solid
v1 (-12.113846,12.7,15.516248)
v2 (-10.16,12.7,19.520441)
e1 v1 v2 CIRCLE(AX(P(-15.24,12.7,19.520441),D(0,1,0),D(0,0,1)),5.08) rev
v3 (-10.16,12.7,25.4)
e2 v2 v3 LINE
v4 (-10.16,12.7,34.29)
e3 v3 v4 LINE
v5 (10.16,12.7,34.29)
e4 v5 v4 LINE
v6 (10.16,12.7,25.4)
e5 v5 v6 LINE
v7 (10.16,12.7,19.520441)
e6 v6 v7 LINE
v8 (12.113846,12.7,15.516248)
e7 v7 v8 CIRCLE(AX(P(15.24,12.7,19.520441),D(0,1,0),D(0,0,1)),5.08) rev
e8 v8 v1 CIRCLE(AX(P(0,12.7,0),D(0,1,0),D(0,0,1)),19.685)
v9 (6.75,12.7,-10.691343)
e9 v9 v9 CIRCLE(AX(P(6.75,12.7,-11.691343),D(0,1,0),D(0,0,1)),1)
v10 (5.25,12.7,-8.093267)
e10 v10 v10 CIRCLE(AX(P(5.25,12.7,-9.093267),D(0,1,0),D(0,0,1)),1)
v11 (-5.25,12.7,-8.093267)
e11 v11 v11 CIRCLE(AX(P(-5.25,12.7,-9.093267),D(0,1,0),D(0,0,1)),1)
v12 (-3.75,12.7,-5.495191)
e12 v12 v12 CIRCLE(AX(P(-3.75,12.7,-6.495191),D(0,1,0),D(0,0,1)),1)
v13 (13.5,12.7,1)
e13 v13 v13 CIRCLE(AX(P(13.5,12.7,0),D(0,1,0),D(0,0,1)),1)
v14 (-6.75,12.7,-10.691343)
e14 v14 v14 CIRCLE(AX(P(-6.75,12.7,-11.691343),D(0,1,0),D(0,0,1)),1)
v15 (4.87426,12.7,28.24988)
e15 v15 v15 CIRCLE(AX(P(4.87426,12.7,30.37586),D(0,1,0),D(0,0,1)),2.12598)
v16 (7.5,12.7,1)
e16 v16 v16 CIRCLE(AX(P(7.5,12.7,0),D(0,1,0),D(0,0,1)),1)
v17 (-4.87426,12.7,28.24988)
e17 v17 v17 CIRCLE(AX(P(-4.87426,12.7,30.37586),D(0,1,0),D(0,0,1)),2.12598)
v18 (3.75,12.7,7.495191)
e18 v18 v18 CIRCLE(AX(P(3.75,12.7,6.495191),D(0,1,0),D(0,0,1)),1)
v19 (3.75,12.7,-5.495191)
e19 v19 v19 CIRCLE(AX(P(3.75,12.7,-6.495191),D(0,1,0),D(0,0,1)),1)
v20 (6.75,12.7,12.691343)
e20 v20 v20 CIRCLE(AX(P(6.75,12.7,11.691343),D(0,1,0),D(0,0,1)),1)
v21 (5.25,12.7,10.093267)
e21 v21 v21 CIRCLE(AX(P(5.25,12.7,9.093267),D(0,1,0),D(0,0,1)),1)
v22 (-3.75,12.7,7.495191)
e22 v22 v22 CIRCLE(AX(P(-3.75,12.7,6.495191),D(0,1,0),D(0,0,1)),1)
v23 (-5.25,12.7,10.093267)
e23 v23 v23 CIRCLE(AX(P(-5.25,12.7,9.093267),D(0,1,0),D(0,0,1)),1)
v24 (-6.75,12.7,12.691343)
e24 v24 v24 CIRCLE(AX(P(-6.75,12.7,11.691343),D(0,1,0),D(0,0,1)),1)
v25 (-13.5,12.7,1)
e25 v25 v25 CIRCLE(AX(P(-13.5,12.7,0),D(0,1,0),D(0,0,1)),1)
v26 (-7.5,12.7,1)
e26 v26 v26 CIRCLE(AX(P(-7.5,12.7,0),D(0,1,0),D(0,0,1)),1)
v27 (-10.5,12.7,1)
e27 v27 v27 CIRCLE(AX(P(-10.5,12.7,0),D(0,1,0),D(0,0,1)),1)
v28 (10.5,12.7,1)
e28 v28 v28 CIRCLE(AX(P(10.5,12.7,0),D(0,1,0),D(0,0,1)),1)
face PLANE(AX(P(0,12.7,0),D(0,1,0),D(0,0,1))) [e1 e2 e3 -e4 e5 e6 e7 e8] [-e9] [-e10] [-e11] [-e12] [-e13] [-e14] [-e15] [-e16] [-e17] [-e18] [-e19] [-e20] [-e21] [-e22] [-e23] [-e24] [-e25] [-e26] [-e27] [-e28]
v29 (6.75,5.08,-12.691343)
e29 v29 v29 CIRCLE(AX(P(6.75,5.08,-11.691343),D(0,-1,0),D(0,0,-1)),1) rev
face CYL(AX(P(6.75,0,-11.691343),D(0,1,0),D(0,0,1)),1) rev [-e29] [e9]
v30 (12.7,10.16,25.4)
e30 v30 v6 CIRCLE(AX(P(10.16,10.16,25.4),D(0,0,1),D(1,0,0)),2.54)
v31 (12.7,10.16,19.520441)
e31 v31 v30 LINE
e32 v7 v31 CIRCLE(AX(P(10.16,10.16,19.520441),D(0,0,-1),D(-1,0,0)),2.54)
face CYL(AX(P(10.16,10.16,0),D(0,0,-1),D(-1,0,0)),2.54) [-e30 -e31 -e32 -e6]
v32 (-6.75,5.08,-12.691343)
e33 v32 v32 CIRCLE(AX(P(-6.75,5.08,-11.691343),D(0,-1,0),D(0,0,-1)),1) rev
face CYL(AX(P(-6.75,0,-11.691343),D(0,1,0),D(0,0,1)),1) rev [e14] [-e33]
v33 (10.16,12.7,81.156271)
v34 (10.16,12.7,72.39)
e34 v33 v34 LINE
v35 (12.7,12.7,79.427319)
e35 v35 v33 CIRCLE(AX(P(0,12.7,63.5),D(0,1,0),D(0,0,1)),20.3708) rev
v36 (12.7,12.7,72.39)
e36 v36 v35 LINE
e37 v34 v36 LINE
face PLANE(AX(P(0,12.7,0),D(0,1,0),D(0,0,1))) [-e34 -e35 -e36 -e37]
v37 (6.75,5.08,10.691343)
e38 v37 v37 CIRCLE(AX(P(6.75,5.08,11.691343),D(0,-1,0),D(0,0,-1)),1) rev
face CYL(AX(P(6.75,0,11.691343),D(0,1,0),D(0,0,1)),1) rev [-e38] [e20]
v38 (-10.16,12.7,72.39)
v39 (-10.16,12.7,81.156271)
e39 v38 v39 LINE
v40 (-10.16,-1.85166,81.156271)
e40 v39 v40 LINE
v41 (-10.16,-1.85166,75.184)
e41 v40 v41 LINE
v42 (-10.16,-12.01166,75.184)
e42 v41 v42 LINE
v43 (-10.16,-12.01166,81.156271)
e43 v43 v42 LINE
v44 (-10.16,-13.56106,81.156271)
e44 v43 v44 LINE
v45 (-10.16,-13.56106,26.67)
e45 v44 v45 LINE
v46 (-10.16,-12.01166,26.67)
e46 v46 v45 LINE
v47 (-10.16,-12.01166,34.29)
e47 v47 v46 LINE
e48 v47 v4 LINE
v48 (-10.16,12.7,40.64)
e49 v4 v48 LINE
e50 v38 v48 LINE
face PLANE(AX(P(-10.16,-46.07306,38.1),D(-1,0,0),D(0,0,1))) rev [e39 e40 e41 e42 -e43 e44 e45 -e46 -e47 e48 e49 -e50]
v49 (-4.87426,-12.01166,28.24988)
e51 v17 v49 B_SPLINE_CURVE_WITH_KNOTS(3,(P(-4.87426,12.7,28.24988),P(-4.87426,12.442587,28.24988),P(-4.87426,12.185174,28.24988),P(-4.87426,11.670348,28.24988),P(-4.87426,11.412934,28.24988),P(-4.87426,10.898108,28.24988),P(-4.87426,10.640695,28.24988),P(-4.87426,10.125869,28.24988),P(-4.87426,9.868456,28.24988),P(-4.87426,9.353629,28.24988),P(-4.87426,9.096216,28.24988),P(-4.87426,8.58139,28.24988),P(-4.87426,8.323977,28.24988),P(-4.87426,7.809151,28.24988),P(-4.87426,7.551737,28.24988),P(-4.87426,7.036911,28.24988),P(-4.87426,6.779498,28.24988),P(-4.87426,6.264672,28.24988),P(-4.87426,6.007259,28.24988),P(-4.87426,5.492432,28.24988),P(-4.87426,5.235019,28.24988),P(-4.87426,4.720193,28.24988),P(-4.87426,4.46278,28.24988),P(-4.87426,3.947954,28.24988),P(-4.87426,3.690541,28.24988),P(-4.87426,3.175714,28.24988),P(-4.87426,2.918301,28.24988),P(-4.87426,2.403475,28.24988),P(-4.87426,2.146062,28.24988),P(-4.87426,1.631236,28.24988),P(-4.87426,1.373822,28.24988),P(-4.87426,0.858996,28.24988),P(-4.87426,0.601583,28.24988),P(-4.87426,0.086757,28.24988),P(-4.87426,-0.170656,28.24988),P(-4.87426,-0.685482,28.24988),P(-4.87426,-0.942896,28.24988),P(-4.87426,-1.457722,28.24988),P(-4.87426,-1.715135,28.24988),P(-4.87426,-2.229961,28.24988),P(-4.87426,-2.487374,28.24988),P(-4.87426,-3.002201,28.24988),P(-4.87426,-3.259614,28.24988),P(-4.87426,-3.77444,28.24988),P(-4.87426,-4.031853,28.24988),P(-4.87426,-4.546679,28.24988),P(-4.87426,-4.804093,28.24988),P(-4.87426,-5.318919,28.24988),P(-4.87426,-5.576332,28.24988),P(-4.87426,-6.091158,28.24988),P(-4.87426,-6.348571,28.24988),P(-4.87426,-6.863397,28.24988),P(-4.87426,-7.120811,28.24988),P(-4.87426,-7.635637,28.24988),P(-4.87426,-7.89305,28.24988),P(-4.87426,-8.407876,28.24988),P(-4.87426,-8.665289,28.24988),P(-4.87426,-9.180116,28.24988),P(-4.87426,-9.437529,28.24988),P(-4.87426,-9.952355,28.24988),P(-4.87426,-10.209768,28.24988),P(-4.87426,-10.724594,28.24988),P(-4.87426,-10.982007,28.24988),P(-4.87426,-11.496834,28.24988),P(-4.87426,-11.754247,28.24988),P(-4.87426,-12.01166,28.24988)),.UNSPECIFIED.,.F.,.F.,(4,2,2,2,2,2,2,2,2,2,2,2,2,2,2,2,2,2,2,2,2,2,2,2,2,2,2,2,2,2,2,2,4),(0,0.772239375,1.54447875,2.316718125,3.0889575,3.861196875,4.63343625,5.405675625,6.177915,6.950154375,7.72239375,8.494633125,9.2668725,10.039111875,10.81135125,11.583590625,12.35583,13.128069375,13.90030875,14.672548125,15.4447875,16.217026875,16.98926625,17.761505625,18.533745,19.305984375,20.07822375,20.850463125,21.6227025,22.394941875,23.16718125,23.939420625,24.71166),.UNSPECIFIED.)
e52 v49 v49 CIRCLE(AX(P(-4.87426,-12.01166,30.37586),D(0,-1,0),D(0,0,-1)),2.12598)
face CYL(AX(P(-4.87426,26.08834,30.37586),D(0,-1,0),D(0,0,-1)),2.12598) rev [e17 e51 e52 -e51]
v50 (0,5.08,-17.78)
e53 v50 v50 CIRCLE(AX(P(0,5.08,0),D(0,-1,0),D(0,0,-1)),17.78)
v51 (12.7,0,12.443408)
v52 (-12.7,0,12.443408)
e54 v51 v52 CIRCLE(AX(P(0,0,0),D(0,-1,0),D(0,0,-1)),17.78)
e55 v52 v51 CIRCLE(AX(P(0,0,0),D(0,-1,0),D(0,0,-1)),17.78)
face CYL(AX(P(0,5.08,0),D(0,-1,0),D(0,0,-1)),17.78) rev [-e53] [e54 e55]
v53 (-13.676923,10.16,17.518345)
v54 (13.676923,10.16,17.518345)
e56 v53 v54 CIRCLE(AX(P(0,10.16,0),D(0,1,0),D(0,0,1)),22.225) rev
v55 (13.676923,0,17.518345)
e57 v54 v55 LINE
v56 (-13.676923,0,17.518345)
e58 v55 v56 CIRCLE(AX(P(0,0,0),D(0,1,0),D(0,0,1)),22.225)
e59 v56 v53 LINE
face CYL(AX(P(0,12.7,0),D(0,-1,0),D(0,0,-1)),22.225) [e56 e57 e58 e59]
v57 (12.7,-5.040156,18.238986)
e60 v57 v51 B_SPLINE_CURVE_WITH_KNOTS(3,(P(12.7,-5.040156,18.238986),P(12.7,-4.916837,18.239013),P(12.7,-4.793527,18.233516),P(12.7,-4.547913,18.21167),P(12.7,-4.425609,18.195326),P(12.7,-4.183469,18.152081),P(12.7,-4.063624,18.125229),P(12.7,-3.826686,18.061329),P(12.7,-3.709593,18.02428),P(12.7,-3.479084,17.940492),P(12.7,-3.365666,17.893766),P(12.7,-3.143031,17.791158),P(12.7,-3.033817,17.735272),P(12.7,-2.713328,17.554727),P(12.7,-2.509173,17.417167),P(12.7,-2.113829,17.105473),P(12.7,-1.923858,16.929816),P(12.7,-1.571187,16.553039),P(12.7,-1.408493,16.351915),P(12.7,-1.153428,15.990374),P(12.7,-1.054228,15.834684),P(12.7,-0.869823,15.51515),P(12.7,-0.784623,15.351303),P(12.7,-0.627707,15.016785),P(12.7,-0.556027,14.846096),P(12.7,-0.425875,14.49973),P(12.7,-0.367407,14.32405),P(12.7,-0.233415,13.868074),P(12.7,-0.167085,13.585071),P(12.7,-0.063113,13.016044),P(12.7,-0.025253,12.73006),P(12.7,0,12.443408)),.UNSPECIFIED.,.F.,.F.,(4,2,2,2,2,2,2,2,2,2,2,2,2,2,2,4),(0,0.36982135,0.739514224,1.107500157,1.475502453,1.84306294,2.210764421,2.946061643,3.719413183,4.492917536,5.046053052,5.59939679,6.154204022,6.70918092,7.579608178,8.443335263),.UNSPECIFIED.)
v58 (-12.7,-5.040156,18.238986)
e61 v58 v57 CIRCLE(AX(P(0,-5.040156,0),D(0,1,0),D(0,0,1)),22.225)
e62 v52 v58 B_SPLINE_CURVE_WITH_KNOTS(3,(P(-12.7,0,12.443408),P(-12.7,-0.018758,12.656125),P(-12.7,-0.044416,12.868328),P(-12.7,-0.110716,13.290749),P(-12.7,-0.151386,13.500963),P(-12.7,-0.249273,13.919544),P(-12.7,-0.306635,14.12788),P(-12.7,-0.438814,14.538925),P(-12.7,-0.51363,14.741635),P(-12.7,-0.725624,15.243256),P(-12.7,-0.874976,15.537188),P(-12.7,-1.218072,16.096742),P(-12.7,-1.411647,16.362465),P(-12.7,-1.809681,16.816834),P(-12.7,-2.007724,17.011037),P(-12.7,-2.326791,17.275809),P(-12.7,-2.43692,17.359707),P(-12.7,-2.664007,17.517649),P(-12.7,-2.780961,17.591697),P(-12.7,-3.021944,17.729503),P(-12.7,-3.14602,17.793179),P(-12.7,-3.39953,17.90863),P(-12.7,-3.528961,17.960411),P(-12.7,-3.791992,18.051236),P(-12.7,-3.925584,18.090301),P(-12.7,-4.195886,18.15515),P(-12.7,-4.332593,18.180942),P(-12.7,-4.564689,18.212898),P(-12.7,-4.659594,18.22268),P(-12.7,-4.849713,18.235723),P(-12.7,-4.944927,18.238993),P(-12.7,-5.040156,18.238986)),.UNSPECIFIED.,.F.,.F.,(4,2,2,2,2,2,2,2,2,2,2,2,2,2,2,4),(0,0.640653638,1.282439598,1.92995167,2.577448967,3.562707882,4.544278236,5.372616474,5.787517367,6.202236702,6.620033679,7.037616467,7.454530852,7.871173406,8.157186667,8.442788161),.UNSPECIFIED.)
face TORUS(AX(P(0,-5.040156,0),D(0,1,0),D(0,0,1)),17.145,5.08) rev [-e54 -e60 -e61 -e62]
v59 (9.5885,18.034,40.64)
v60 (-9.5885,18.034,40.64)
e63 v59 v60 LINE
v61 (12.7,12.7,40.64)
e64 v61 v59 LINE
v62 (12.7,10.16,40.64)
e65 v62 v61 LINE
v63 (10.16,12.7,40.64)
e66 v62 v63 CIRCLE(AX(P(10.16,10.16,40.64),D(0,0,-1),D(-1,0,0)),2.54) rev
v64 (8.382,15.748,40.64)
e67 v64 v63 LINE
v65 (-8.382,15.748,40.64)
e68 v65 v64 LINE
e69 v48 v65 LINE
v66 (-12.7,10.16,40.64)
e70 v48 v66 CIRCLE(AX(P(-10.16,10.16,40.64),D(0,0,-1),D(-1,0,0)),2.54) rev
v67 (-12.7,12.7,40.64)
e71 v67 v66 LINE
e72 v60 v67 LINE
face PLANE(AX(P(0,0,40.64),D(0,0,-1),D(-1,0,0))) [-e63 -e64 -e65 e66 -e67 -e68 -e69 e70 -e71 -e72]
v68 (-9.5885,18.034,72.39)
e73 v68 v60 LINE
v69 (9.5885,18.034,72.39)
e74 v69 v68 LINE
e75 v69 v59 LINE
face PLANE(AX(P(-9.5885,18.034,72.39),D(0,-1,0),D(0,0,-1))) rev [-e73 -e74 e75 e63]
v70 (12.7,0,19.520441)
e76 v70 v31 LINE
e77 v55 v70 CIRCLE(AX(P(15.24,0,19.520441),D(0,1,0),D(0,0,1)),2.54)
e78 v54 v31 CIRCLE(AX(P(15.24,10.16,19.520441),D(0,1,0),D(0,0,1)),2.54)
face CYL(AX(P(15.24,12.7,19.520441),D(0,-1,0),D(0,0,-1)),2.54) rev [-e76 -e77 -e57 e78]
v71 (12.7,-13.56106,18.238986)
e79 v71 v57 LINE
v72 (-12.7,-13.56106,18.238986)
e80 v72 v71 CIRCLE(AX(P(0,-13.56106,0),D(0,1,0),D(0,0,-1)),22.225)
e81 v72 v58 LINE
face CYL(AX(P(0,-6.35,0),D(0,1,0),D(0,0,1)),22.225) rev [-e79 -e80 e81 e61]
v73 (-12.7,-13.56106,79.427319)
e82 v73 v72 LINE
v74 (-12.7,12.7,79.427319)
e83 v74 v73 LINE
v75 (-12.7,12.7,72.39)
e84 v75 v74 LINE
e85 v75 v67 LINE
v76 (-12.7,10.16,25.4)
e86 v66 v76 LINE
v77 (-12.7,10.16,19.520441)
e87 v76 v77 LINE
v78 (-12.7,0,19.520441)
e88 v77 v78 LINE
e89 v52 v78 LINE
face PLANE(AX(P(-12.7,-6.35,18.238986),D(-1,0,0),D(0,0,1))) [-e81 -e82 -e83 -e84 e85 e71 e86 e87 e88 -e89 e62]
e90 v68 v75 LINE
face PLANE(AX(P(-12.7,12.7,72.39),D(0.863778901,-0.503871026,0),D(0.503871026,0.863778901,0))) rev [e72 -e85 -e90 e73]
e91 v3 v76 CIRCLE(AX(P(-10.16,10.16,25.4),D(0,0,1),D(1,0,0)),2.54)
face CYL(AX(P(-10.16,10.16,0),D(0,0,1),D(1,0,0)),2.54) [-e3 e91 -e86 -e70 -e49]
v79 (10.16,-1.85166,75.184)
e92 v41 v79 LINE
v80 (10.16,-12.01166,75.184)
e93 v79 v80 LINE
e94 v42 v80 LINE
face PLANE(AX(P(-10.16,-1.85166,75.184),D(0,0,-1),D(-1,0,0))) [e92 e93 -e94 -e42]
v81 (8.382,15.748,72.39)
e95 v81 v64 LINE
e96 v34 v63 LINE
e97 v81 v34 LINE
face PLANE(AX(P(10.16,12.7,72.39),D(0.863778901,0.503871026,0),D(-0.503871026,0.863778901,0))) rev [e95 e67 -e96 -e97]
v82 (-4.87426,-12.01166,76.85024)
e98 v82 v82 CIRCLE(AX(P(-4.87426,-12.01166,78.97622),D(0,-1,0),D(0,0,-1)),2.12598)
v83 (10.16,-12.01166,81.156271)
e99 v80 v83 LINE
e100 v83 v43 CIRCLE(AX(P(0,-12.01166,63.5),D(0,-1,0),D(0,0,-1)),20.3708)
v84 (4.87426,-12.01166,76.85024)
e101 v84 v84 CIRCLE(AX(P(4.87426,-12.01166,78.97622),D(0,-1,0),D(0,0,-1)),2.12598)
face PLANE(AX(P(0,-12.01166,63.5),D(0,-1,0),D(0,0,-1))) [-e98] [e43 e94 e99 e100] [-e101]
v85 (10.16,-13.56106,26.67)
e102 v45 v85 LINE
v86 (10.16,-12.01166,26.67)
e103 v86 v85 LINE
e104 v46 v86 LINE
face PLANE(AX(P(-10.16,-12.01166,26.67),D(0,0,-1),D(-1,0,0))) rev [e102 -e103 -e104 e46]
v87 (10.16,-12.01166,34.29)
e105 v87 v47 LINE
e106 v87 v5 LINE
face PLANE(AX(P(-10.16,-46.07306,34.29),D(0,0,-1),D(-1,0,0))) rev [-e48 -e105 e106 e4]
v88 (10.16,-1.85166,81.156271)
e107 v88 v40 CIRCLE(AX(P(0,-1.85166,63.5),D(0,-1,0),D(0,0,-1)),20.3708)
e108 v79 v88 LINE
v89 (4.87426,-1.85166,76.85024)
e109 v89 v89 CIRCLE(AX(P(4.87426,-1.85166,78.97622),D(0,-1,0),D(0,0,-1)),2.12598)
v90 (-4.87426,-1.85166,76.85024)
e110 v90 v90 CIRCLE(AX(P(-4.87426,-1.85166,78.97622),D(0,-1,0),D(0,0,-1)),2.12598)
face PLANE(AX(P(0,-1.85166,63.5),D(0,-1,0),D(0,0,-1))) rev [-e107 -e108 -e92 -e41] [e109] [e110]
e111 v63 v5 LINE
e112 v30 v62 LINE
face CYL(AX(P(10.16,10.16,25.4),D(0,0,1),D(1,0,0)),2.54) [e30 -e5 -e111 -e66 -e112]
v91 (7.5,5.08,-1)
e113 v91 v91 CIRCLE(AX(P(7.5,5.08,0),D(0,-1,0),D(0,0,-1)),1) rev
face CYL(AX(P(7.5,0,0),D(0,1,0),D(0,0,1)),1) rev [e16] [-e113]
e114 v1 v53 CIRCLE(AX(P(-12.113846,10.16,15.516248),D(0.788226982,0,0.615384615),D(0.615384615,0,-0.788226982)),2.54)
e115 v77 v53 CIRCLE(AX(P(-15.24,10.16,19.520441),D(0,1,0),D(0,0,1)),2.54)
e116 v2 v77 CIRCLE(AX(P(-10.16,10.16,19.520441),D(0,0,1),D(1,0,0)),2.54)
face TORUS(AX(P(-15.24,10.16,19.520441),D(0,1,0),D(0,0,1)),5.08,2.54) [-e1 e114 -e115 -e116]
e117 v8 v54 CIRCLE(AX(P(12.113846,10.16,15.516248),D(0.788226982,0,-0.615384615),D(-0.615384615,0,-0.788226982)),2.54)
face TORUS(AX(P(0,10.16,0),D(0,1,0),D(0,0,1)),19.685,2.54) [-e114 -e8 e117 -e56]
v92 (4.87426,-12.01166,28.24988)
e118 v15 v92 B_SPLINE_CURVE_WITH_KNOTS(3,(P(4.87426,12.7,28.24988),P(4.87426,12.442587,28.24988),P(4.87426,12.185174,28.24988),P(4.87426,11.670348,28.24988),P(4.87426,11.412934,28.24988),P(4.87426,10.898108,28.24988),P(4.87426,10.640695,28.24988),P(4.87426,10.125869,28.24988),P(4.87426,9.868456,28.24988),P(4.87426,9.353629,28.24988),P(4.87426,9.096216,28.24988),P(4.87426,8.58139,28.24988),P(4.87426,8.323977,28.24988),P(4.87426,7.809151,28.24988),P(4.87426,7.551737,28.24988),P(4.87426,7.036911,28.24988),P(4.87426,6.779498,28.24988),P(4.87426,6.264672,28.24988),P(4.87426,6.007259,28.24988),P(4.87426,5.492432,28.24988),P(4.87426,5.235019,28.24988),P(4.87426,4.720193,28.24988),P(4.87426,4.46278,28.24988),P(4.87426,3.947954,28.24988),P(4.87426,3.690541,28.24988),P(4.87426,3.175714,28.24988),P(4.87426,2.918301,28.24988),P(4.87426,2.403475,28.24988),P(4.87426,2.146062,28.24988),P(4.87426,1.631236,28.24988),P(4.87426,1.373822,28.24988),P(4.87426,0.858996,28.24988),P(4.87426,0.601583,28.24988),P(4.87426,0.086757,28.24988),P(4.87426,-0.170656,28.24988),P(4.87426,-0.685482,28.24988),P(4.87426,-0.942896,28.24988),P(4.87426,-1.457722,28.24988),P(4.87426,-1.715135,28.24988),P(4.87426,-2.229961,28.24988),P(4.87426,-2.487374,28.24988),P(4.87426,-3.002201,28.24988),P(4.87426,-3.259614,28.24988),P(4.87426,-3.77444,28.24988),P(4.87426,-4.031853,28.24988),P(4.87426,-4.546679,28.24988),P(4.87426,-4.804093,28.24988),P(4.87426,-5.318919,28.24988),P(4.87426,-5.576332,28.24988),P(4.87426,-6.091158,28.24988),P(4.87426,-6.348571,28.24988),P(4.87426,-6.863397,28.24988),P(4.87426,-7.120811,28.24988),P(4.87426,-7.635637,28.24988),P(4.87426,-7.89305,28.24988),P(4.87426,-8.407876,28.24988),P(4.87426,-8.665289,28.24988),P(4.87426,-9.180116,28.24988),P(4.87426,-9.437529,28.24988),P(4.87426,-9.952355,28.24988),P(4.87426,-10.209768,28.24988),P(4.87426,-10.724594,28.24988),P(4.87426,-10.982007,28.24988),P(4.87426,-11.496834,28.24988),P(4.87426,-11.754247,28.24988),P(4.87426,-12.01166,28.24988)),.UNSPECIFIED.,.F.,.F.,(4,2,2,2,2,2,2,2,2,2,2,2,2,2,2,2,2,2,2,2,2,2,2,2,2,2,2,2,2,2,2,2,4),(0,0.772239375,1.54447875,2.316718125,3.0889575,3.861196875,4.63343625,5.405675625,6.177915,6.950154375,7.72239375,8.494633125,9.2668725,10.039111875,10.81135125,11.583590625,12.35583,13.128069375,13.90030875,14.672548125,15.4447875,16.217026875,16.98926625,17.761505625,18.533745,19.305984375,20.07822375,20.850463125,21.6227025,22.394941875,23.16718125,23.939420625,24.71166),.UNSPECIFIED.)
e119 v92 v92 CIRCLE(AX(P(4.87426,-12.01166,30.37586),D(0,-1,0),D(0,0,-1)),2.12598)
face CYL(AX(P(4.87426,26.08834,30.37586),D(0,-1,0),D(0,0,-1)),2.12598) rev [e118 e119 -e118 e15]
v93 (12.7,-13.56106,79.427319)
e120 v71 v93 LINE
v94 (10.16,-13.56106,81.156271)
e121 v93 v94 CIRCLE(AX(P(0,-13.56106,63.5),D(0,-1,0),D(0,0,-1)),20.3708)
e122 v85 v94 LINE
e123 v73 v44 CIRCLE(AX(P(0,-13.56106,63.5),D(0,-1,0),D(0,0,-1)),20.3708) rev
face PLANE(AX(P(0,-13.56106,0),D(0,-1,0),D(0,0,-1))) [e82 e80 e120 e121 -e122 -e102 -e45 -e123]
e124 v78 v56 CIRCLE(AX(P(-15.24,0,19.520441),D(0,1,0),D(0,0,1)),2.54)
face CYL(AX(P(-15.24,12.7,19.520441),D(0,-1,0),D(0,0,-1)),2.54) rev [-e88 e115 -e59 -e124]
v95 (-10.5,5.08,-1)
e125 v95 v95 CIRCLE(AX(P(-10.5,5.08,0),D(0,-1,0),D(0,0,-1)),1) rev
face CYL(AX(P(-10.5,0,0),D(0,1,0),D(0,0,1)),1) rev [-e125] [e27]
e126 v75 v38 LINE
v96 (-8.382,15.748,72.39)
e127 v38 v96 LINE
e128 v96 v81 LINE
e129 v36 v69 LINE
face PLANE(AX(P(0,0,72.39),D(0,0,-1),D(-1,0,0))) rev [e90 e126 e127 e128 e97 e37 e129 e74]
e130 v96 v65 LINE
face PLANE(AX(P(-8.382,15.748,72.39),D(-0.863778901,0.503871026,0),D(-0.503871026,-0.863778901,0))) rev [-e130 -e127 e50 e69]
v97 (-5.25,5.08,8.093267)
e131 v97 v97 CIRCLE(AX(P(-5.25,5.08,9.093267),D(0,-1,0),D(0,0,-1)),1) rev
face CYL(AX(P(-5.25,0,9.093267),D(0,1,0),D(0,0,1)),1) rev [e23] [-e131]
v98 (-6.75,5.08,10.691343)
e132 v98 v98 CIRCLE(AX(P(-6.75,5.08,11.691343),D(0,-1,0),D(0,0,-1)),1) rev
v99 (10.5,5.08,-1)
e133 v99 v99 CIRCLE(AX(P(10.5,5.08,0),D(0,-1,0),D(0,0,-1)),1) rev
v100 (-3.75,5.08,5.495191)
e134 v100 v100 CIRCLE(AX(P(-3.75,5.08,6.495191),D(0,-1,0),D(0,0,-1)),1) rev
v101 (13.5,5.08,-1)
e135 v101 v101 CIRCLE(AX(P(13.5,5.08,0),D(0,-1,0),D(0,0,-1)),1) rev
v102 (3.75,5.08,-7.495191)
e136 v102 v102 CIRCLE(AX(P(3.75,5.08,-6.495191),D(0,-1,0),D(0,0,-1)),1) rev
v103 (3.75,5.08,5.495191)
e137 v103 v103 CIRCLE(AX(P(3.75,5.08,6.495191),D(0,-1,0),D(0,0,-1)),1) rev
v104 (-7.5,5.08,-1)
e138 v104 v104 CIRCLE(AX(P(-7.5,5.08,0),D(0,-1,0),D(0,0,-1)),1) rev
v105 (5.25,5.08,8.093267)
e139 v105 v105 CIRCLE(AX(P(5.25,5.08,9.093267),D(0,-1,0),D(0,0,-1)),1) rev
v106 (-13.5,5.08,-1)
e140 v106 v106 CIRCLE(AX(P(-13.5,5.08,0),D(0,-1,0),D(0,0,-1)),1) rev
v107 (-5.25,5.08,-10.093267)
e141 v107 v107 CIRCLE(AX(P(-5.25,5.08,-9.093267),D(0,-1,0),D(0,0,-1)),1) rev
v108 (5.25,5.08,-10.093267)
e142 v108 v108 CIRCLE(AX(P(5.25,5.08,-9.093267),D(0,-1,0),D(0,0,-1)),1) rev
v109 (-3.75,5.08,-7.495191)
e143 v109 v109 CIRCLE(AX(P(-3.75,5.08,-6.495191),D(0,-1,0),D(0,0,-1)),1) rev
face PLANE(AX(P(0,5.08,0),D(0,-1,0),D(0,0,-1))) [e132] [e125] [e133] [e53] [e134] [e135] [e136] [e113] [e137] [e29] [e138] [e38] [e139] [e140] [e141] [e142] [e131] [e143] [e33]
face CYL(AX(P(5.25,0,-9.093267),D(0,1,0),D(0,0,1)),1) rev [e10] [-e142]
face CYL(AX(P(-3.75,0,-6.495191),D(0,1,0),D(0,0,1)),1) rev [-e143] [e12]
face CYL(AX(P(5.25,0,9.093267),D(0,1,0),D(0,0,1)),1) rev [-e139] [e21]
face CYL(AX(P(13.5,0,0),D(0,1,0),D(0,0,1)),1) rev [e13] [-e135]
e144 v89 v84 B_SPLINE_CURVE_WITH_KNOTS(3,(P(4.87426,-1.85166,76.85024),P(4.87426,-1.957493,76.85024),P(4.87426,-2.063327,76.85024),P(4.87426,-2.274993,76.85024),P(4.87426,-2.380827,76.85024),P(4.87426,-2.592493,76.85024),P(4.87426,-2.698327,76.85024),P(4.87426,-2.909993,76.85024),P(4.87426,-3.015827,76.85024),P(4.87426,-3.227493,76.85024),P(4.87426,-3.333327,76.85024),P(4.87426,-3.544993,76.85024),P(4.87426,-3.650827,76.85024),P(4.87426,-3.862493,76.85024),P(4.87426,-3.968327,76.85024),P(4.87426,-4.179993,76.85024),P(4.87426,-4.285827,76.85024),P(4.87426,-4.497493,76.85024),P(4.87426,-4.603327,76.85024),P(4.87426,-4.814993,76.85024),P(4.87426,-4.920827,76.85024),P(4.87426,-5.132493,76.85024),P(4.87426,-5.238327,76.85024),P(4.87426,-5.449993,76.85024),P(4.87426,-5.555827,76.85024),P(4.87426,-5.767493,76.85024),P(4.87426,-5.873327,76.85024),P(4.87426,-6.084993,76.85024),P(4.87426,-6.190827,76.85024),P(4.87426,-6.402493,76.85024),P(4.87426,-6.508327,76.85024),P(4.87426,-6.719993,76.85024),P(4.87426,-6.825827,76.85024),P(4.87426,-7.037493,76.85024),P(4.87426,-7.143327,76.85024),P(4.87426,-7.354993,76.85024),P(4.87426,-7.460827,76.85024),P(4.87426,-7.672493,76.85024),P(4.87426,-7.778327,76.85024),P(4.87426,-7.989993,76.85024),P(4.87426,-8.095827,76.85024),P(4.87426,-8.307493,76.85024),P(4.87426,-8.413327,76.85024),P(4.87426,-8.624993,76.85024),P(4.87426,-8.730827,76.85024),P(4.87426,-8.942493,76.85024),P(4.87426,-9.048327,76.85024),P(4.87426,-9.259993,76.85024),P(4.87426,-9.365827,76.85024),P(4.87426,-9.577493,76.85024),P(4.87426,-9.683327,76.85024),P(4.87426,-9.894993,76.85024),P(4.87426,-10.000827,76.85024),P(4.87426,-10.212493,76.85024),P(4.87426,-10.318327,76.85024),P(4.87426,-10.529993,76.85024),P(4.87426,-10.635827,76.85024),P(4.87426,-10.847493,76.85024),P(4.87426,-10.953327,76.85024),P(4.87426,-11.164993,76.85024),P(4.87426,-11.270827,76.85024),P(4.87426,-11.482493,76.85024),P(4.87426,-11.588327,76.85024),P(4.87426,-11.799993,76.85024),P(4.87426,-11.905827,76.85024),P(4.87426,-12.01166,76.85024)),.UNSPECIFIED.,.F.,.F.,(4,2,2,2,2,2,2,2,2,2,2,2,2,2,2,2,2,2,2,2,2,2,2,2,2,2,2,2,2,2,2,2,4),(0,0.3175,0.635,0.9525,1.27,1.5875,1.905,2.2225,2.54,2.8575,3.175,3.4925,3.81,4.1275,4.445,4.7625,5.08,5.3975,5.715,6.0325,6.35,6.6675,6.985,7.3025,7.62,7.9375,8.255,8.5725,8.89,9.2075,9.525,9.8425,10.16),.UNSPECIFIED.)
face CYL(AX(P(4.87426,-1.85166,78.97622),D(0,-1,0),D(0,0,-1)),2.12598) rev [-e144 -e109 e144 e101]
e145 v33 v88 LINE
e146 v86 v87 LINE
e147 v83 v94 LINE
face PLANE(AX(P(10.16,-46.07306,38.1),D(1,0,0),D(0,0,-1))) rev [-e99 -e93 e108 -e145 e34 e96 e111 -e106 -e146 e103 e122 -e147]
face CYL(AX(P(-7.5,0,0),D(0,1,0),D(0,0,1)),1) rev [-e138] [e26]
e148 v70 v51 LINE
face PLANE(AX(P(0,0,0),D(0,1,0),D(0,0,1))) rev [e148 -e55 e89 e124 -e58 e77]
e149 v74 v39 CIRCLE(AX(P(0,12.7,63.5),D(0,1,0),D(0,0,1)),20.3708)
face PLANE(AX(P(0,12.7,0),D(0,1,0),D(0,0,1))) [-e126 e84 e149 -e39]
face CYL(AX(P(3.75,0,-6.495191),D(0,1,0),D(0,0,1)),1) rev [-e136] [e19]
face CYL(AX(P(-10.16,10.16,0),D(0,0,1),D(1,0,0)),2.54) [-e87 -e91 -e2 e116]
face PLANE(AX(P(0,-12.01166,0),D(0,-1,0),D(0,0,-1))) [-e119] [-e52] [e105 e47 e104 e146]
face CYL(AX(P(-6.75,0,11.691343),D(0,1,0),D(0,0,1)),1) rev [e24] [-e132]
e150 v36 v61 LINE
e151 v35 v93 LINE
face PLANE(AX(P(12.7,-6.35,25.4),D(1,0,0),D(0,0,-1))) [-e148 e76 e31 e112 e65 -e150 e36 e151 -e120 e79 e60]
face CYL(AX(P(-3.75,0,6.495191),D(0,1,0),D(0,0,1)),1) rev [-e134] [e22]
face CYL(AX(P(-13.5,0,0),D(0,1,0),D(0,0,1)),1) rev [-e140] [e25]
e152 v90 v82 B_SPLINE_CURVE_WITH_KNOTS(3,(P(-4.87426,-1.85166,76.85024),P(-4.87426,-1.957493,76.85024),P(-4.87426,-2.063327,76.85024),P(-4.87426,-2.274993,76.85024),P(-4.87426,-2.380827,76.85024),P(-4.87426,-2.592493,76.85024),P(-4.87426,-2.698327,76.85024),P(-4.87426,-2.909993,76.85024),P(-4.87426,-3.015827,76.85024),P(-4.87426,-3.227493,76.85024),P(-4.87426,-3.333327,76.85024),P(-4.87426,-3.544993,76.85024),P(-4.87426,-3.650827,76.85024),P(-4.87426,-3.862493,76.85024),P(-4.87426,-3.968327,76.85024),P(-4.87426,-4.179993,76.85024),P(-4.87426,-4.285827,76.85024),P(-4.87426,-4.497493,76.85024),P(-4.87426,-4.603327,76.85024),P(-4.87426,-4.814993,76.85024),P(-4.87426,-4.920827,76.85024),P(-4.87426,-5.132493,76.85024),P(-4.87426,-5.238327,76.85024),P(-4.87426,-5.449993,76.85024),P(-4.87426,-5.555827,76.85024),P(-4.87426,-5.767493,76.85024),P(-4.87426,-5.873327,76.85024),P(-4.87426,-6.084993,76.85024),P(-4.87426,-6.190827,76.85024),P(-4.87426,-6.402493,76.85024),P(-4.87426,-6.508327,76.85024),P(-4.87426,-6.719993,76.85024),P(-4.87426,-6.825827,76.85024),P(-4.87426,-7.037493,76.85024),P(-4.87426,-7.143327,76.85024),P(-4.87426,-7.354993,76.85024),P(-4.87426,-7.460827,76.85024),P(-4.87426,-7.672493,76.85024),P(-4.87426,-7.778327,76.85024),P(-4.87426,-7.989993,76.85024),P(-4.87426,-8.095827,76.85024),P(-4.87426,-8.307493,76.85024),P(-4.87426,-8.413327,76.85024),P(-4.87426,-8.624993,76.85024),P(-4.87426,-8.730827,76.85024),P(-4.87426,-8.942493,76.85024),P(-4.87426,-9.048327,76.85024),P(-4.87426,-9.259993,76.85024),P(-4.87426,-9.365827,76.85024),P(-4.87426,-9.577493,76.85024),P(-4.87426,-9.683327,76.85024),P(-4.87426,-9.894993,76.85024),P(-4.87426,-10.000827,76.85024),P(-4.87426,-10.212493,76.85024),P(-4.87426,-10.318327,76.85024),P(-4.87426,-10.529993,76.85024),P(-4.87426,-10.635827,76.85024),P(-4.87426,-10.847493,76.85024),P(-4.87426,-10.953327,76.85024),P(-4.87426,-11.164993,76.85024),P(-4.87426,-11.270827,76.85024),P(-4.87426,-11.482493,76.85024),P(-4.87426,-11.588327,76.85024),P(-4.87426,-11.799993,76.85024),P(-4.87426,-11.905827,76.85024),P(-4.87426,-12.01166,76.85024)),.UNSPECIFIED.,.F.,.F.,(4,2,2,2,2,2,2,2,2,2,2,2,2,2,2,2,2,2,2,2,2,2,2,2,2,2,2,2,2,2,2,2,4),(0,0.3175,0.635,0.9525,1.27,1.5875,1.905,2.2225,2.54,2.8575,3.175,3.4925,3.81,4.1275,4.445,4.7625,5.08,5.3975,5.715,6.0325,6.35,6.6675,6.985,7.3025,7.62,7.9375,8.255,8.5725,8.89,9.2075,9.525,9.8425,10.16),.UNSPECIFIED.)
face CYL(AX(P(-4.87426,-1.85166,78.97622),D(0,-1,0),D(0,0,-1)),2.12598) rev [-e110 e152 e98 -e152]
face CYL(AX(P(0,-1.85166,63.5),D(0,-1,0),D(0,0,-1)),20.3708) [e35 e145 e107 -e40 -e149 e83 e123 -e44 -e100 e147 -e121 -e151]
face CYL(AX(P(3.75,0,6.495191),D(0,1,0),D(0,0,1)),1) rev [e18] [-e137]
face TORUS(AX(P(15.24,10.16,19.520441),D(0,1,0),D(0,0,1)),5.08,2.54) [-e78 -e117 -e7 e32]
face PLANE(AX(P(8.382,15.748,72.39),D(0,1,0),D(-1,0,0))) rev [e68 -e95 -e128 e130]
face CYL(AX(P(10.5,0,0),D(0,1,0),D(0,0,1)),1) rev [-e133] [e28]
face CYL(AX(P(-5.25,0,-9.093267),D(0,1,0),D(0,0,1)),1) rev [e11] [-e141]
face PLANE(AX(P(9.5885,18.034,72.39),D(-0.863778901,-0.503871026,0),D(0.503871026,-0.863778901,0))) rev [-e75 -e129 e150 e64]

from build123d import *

# Parameters (mm, degrees)
SKETCH2_R           = 22.224999999999998
BOSS_EXTRUDE1_DEPTH = 12.7
SKETCH3_R           = 1.0000000000000009
SKETCH3_R_2         = 1.0000000000000002
SKETCH3_R_3         = 0.9999999999999998
CUT_EXTRUDE1_DEPTH  = 34.89972345019941
BOSS_EXTRUDE2_START = -19.05
BOSS_EXTRUDE2_DEPTH = 19.05
SKETCH8_R           = 17.779999999999998
CUT_EXTRUDE2_DEPTH  = 5.08
FILLET5_R           = 5.08
FILLET6_R           = 2.5399999999999996
FILLET7_R           = 2.5399999999999996
BOSS_EXTRUDE3_START = 7.211059999999999
BOSS_EXTRUDE3_DEPTH = 7.211059999999999
BOSS_EXTRUDE4_DEPTH = 25.4
SKETCH13_W          = 25.399999999999995
SKETCH13_H          = 26.261059999999993
BOSS_EXTRUDE5_DEPTH = 12.7
SKETCH15_W          = 20.32
SKETCH15_H          = 3.8100000000000023
CUT_EXTRUDE3_DEPTH  = 58.77305999999999
SKETCH16_W          = 20.32
SKETCH16_H          = 7.619999999999997
CUT_EXTRUDE4_DEPTH  = 1.5493999999999999
SKETCH18_R          = 2.1259799999999998
SKETCH18_R_2        = 2.12598
CUT_EXTRUDE5_DEPTH  = 38.09999999999998
SKETCH19_W          = 2.5399999999999974
SKETCH19_H          = 26.261059999999993
BOSS_EXTRUDE6_DEPTH = 39.370000000000005
BOSS_EXTRUDE7_DEPTH = 31.75
FILLET12_R          = 2.54
FILLET13_R          = 2.54
BOSS_EXTRUDE8_DEPTH = 10.15999999999999
SKETCH25_R          = 2.1259800000000015
SKETCH25_R_2        = 2.125980000000002
CUT_EXTRUDE6_DEPTH  = 10.15999999999999
BOSS_EXTRUDE9_DEPTH = 26.26106


# Some blends are built 0.0001 mm under size
with BuildPart() as part:
    # Sketch2 → Boss-Extrude1 (new body)
    with BuildSketch(Plane(origin=(0, 0, 0), x_dir=(1, 0, 0), z_dir=(0, 1, 0))):
        with Locations(Location((0, 0, 0), (0, 0, 270))):
            Circle(SKETCH2_R)
    extrude(amount=BOSS_EXTRUDE1_DEPTH)

    # Sketch3 → Cut-Extrude1 (cut, through all)
    with BuildSketch(Plane(origin=(0, 12.7, 0), x_dir=(1, 0, 0), z_dir=(0, 1, 0))):
        with Locations(Location((-6.750000000000055, -11.691342951089895, 0), (0, 0, 270))):
            Circle(SKETCH3_R)
        with Locations(Location((-5.2500000000000435, -9.093266739736585, 0), (0, 0, 270))):
            Circle(SKETCH3_R)
        with Locations(Location((-3.7500000000000306, -6.495190528383274, 0), (0, 0, 270))):
            Circle(SKETCH3_R_2)
        with Locations(Location((-13.5, -9.2e-16, 0), (0, 0, 270))):
            Circle(SKETCH3_R_3)
        with Locations(Location((-10.5, -9.2e-16, 0), (0, 0, 270))):
            Circle(SKETCH3_R_3)
        with Locations(Location((-7.5, -9.2e-16, 0), (0, 0, 270))):
            Circle(SKETCH3_R_3)
        with Locations(Location((-3.7499999999999396, 6.495190528383324, 0), (0, 0, 270))):
            Circle(SKETCH3_R_3)
        with Locations(Location((-5.2499999999999165, 9.093266739736652, 0), (0, 0, 270))):
            Circle(SKETCH3_R)
        with Locations(Location((-6.749999999999892, 11.69134295108998, 0), (0, 0, 270))):
            Circle(SKETCH3_R)
        with Locations(Location((6.750000000000136, 11.69134295108984, 0), (0, 0, 270))):
            Circle(SKETCH3_R)
        with Locations(Location((5.250000000000107, 9.093266739736544, 0), (0, 0, 270))):
            Circle(SKETCH3_R)
        with Locations(Location((3.750000000000076, 6.495190528383245, 0), (0, 0, 270))):
            Circle(SKETCH3_R_2)
        with Locations(Location((13.5, -9.2e-16, 0), (0, 0, 270))):
            Circle(SKETCH3_R_3)
        with Locations(Location((10.5, -9.2e-16, 0), (0, 0, 270))):
            Circle(SKETCH3_R_3)
        with Locations(Location((7.5, -9.2e-16, 0), (0, 0, 270))):
            Circle(SKETCH3_R_3)
        with Locations(Location((3.749999999999985, -6.4951905283833, 0), (0, 0, 270))):
            Circle(SKETCH3_R_2)
        with Locations(Location((5.24999999999998, -9.09326673973662, 0), (0, 0, 270))):
            Circle(SKETCH3_R)
        with Locations(Location((6.749999999999973, -11.69134295108994, 0), (0, 0, 270))):
            Circle(SKETCH3_R)
    extrude(amount=-CUT_EXTRUDE1_DEPTH, mode=Mode.SUBTRACT)

    # Sketch4 → Boss-Extrude2 (add)
    with BuildSketch(Plane(origin=(0, 12.7, 0), x_dir=(1, 0, 0), z_dir=(0, 1, 0)).offset(BOSS_EXTRUDE2_START)):
        with BuildLine():
            Line((-12.7, -18.23898640275824), (-12.7, -25.4))
            Line((-12.7, -25.4), (12.7, -25.4))
            Line((12.7, -25.4), (12.7, -18.23898640275824))
            ThreePointArc((12.7, -18.23898640275824), (1.36e-15, -22.224999999999998), (-12.7, -18.23898640275824))
        make_face()
    extrude(amount=BOSS_EXTRUDE2_DEPTH)

    # Sketch8 → Cut-Extrude2 (cut)
    with BuildSketch(Plane.XZ):
        with Locations(Location((0, 0, 0), (0, 0, 270))):
            Circle(SKETCH8_R)
    extrude(amount=-CUT_EXTRUDE2_DEPTH, mode=Mode.SUBTRACT)

    # Fillet5
    # the kernel refuses this fillet: 5.08 mm, written as the material it adds along each edge
    with BuildSketch(Plane(origin=(0, 0, 0), x_dir=(0.9228165811173926, 0, 0.3852396106513539), z_dir=(0.3852396106513539, 0, -0.9228165811173926))) as fillet5_piece_1_section:
        with BuildLine():
            CenterArc((17.144999999999996, 5.040156247578053), FILLET5_R, 277.1807557814583, 82.81924421854174)
            Line((22.224999999999998, 5.040156247578053), (22.225000000000648, 0))
            Line((22.225000000000648, 0), (17.779999999999994, 7.11e-15))
        make_face()
    fillet5_piece_1 = revolve(axis=Axis((0, 0, 0), (0, -1, 0)), revolution_arc=134.68276722332823, mode=Mode.PRIVATE)
    fillet5_piece_1 = split(fillet5_piece_1, bisect_by=Plane(origin=(-12.7, -1.6733318741959158, 20.962619999999998), z_dir=(1, 0, 0)), keep=Keep.TOP, mode=Mode.PRIVATE)
    fillet5_piece_1 = split(fillet5_piece_1, bisect_by=Plane(origin=(12.7, -1.6733318741959158, 20.962619999999998), z_dir=(-1, 0, 0)), keep=Keep.TOP, mode=Mode.PRIVATE)
    add(fillet5_piece_1)

    # Fillet6
    fillet6_edges = [part.edges().sort_by_distance(p)[0] for p in [
        (-12.699999999999998, 6.35, 18.238986402758243),
        (12.7, 6.35, 18.23898640275824),
    ]]
    fillet(fillet6_edges, radius=FILLET6_R)

    # Fillet7
    fillet7_edges = [part.edges().sort_by_distance(p)[0] for p in [
        (6.8e-15, 12.7, -22.224999999999998),
        (-12.7, 12.7, 22.460220604576516),
        (12.957258732946789, 12.7, 18.406577524633107),
        (-12.957258732946793, 12.7, 18.4065775246331),
        (12.7, 12.7, 22.460220604576516),
    ]]
    fillet(fillet7_edges, radius=FILLET7_R)

    # Sketch9 → Boss-Extrude3 (add)
    with BuildSketch(Plane.XZ.offset(6.350000000000001).offset(BOSS_EXTRUDE3_START)):
        with BuildLine():
            Line((12.699999999999998, 18.238986402758243), (12.7, 25.4))
            Line((12.7, 25.4), (-12.7, 25.4))
            Line((-12.7, 25.4), (-12.699999999999998, 18.23898640275824))
            ThreePointArc((-12.699999999999998, 18.23898640275824), (1.36e-15, 22.225), (12.699999999999998, 18.238986402758243))
        make_face()
    extrude(amount=-BOSS_EXTRUDE3_DEPTH)

    # Sketch10 → Boss-Extrude4 (add)
    with BuildSketch(Plane(origin=(12.7, 0, 0), x_dir=(0, 0, -1), z_dir=(1, 0, 0))):
        Polygon((-25.4, 12.7), (-38.1, -0.8610600000000003), (-38.1, -13.56106), (-25.4, -13.56106), align=None)
    extrude(amount=-BOSS_EXTRUDE4_DEPTH)

    # Sketch13 → Boss-Extrude5 (add)
    with BuildSketch(Plane.XY.offset(38.1)):
        with Locations((0, -0.4305300000000001)):
            Rectangle(SKETCH13_W, SKETCH13_H)
    extrude(amount=-BOSS_EXTRUDE5_DEPTH)

    # Sketch15 → Cut-Extrude3 (cut)
    with BuildSketch(Plane(origin=(0, 12.7, 0), x_dir=(1, 0, 0), z_dir=(0, 1, 0))):
        with Locations((0, -36.195)):
            Rectangle(SKETCH15_W, SKETCH15_H)
    extrude(amount=-CUT_EXTRUDE3_DEPTH, mode=Mode.SUBTRACT)

    # Sketch16 → Cut-Extrude4 (cut)
    with BuildSketch(Plane.XZ.offset(13.56106)):
        with Locations((0, 30.48)):
            Rectangle(SKETCH16_W, SKETCH16_H)
    extrude(amount=-CUT_EXTRUDE4_DEPTH, mode=Mode.SUBTRACT)

    # Sketch18 → Cut-Extrude5 (cut)
    with BuildSketch(Plane.XZ.offset(12.011660000000001)):
        with Locations(Location((-4.8742600000000005, 30.375860000000003, 0), (0, 0, 270))):
            Circle(SKETCH18_R)
        with Locations(Location((4.8742600000000005, 30.375860000000003, 0), (0, 0, 270))):
            Circle(SKETCH18_R_2)
    extrude(amount=-CUT_EXTRUDE5_DEPTH, mode=Mode.SUBTRACT)

    # Sketch19 → Boss-Extrude6 (add)
    with BuildSketch(Plane.XY.offset(38.1)):
        with Locations((-11.43, -0.4305300000000001)):
            Rectangle(SKETCH19_W, SKETCH19_H)
        Polygon((10.16, 12.7), (10.159999999999998, -13.56106), (12.7, -13.56106), (12.7, 12.7), align=None)
    extrude(amount=BOSS_EXTRUDE6_DEPTH)

    # Sketch20 → Boss-Extrude7 (add)
    with BuildSketch(Plane.XY.offset(40.64)):
        Polygon((-12.7, 12.7), (-9.5885, 18.033999999999995), (9.588500000000002, 18.033999999999995), (12.7, 12.7), (10.16, 12.7), (8.382000000000001, 15.747999999999998), (-8.382000000000001, 15.747999999999994), (-10.16, 12.7), align=None)
    extrude(amount=BOSS_EXTRUDE7_DEPTH)

    # Fillet12
    fillet12_edges = [part.edges().sort_by_distance(p)[0] for p in [
        (12.699999999999998, 12.699999999999998, 33.02),
    ]]
    fillet(fillet12_edges, radius=FILLET12_R - 0.0001)  # a hair under: the kernel refuses the full size

    # Fillet13
    fillet13_edges = [part.edges().sort_by_distance(p)[0] for p in [
        (-12.699999999999998, 12.699999999999998, 33.02),
    ]]
    fillet(fillet13_edges, radius=FILLET13_R - 0.0001)  # a hair under: the kernel refuses the full size

    # Sketch24 → Boss-Extrude8 (add)
    with BuildSketch(Plane.XZ.offset(12.011660000000001)):
        with BuildLine():
            Line((-10.16, 75.184), (-10.16, 81.15627063227116))
            ThreePointArc((-10.16, 81.15627063227116), (1.25e-15, 83.87080000000003), (10.159999999999998, 81.15627063227116))
            Line((10.159999999999998, 81.15627063227116), (10.16, 75.184))
            Line((10.16, 75.184), (-10.16, 75.184))
        make_face()
    extrude(amount=-BOSS_EXTRUDE8_DEPTH)

    # Sketch25 → Cut-Extrude6 (cut)
    with BuildSketch(Plane.XZ.offset(12.011660000000001)):
        with Locations(Location((-4.8742600000000005, 78.97622, 0), (0, 0, 270))):
            Circle(SKETCH25_R)
        with Locations(Location((4.874260000000001, 78.97622, 0), (0, 0, 270))):
            Circle(SKETCH25_R_2)
    extrude(amount=-CUT_EXTRUDE6_DEPTH, mode=Mode.SUBTRACT)

    # Sketch26 → Boss-Extrude9 (add)
    with BuildSketch(Plane.XZ.offset(13.56106)):
        with BuildLine():
            ThreePointArc((-12.7, 79.4273190663087), (-11.462644475833708, 80.33975279689817), (-10.16, 81.15627063227114))
            Line((-10.16, 81.15627063227114), (-10.16, 77.47000000000001))
            Line((-10.16, 77.47000000000001), (-12.7, 77.47000000000001))
            Line((-12.7, 77.47000000000001), (-12.7, 79.4273190663087))
        make_face()
        with BuildLine():
            ThreePointArc((12.7, 79.4273190663087), (11.4626444758337, 80.33975279689815), (10.159999999999991, 81.15627063227114))
            Line((10.159999999999998, 81.15627063227116), (10.159999999999998, 77.47000000000001))
            Line((10.159999999999998, 77.47000000000001), (12.7, 77.47000000000001))
            Line((12.7, 77.47000000000001), (12.7, 79.4273190663087))
        make_face()
    extrude(amount=-BOSS_EXTRUDE9_DEPTH)


solid = part.part
